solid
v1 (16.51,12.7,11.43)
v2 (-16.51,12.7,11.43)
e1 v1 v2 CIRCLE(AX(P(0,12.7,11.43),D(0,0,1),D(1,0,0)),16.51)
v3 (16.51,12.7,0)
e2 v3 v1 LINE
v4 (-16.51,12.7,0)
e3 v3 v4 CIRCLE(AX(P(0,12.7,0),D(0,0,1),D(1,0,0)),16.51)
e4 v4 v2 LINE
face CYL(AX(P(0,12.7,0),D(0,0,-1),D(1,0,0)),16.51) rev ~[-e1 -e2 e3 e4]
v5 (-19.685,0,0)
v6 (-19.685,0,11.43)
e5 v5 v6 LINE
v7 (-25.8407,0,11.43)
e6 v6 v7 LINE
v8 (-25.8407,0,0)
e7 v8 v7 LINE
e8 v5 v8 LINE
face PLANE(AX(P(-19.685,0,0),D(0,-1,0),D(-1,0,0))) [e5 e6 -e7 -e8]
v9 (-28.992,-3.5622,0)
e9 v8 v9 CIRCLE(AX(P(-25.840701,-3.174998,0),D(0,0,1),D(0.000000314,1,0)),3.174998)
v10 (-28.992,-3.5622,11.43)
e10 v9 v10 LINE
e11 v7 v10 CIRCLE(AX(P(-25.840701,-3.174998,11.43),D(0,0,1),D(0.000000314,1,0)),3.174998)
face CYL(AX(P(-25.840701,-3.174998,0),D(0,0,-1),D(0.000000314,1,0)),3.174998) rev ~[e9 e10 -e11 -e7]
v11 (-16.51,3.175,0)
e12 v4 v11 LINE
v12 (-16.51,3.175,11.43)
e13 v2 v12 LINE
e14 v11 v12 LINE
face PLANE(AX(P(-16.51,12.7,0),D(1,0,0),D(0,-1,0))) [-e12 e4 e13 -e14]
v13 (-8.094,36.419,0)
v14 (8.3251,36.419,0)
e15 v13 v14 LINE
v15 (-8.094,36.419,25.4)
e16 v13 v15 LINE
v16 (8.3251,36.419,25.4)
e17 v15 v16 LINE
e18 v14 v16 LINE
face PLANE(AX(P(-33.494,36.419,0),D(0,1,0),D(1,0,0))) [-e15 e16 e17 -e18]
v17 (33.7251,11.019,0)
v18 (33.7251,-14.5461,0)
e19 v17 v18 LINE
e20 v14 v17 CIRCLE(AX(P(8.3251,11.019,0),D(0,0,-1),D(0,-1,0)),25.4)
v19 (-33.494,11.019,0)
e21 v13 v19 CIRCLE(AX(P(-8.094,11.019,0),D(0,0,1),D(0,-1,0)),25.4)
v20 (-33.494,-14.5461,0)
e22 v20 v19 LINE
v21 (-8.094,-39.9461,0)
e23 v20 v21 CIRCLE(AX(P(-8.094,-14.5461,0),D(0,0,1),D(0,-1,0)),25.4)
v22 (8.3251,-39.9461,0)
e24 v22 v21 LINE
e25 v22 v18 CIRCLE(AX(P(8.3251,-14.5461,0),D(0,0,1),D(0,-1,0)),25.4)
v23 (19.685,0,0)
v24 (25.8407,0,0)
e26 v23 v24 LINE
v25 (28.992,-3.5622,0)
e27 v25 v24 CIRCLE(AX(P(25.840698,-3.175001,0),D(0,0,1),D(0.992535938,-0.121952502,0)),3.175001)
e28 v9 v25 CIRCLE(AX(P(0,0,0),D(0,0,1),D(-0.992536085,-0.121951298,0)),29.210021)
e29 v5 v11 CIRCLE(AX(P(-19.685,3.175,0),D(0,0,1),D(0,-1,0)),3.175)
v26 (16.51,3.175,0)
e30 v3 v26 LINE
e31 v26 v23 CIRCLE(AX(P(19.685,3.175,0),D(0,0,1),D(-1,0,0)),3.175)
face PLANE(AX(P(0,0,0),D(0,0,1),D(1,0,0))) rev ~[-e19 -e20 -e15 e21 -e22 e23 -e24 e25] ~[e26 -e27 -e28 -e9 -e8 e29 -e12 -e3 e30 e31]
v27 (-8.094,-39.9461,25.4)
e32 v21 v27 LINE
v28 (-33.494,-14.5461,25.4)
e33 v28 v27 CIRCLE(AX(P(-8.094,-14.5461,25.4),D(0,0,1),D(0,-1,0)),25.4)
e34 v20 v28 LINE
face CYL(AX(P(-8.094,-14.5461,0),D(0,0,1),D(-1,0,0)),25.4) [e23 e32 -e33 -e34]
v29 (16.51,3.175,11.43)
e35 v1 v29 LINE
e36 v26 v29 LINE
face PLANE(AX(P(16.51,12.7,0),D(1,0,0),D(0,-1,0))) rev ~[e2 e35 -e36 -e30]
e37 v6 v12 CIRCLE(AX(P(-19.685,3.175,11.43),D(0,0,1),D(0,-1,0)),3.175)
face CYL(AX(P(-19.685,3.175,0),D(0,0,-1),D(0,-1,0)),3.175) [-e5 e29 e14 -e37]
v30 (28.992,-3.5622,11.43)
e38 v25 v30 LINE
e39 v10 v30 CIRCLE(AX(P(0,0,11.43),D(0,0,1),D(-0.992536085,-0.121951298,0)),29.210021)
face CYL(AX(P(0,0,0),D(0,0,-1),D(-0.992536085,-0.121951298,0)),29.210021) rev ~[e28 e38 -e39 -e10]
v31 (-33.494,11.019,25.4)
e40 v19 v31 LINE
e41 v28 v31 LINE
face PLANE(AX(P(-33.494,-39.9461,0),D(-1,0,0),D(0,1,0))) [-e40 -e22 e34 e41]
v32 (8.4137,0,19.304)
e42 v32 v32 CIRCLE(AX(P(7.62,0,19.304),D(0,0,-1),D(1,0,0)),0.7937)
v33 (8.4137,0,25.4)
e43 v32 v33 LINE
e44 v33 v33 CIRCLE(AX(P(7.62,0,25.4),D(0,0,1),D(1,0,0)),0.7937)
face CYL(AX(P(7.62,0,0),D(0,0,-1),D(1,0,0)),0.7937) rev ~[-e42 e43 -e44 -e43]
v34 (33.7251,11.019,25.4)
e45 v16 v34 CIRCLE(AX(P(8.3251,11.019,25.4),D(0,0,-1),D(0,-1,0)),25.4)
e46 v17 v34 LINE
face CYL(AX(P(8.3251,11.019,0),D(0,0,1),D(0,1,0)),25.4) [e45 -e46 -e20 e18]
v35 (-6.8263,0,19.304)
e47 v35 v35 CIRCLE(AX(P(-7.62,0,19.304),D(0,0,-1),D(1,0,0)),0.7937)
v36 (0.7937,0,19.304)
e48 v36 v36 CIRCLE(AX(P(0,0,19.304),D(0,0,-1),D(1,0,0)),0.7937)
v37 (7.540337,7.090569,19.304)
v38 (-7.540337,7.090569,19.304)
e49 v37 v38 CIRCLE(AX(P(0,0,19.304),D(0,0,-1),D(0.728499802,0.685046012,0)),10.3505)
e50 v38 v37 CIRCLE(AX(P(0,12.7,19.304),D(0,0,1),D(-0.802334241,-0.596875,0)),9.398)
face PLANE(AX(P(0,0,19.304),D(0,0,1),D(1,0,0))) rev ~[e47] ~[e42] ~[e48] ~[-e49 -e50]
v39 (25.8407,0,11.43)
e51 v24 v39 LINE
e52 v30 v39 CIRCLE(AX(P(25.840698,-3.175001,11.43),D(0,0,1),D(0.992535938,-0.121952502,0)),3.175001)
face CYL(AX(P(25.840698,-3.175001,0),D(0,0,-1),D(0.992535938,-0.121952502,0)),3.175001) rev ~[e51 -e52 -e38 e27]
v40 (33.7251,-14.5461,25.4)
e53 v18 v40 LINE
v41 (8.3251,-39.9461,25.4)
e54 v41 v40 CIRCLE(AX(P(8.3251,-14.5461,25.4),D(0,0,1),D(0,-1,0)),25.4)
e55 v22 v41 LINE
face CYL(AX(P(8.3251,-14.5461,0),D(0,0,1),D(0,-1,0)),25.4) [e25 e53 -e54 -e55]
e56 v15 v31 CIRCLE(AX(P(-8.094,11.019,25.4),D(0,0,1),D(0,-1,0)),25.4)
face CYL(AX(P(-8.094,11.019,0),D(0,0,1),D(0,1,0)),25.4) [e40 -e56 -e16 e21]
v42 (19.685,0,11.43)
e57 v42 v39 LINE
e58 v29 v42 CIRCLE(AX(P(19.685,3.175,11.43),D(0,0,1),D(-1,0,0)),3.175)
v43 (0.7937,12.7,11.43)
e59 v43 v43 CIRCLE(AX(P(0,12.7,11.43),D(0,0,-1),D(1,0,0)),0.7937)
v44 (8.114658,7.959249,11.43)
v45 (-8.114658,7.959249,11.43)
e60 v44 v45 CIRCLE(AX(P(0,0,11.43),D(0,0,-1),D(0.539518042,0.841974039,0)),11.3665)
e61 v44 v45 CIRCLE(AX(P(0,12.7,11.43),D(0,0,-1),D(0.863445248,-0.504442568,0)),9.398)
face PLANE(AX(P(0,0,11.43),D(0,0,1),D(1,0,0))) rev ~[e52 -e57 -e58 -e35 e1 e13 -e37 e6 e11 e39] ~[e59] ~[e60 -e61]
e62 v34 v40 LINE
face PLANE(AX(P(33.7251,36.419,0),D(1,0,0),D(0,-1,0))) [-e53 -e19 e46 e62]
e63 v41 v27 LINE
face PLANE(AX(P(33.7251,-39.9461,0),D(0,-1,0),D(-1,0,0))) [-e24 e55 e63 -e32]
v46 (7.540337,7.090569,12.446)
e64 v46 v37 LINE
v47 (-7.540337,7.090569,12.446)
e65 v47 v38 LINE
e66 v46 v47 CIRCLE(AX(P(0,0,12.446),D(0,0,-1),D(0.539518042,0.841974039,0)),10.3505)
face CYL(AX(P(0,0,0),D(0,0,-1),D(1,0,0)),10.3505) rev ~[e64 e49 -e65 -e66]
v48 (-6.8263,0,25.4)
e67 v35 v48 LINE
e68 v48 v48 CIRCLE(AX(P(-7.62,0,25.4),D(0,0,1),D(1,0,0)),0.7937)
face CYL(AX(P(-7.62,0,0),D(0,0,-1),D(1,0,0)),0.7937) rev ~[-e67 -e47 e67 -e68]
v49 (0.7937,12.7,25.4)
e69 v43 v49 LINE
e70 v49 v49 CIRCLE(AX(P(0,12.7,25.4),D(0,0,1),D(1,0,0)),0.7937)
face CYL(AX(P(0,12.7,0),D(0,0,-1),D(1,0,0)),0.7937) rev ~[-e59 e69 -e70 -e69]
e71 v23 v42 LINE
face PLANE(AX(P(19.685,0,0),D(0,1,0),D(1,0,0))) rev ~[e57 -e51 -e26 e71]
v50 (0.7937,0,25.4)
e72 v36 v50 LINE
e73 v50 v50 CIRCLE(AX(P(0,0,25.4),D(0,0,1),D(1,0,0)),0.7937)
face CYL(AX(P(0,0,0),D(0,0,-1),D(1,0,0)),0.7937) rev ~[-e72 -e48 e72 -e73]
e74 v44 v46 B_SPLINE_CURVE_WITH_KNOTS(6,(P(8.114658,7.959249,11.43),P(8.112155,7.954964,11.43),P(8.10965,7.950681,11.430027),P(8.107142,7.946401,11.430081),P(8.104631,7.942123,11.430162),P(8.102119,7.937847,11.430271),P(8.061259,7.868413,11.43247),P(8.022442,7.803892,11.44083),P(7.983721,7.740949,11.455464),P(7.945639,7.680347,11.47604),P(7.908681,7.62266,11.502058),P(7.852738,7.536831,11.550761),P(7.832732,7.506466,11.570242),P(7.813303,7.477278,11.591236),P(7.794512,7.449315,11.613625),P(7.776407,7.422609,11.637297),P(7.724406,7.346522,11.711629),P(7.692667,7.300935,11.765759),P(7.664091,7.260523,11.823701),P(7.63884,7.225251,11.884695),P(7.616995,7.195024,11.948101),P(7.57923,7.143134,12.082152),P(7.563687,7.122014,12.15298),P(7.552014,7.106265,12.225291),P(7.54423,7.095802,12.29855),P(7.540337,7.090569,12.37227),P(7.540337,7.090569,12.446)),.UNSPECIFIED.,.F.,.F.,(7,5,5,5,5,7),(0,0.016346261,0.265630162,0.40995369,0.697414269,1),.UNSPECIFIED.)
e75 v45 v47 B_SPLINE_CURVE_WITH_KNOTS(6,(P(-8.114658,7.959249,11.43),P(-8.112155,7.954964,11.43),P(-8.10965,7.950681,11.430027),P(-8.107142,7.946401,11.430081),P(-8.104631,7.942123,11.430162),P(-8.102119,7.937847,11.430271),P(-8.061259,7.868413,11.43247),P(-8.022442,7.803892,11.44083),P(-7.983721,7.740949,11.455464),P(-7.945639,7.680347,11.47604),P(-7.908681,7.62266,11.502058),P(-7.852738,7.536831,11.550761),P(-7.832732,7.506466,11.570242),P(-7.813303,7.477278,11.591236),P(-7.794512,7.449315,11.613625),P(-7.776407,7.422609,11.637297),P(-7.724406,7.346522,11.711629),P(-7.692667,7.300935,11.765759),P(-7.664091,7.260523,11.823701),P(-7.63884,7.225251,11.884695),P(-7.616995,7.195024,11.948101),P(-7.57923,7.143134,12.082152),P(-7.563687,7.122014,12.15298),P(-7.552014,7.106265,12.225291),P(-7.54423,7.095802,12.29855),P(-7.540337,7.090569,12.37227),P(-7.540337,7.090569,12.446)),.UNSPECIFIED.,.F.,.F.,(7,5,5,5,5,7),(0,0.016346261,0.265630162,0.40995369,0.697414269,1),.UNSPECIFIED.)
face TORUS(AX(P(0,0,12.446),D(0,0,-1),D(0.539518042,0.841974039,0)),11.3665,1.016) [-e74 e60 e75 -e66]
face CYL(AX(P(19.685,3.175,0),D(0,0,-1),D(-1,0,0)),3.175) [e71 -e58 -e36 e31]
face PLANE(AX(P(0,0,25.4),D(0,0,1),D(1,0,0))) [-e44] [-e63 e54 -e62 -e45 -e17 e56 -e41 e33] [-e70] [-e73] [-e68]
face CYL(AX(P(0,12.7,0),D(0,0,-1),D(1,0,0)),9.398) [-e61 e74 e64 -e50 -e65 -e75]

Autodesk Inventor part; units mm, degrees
ref_plane "YZ Plane" through (0, 0, 0) normal (1, 0, 0) x (0, 1, 0)
ref_plane "XZ Plane" through (0, 0, 0) normal (0, 1, 0) x (-1, 0, 0)
ref_plane "XY Plane" through (0, 0, 0) normal (0, 0, 1) x (1, 0, 0)
sketch "Sketch1" plane through (0, 0, 0) normal (0, 0, 1) x (1, 0, 0)
  circle A0 centre (0, 12.7) radius 4.0132
  circle A1 centre (-7.62, 0) radius 1.7145
  circle A2 centre (7.62, 0) radius 1.7145
  circle A3 centre (0, 0) radius 9.525
  arc A4 (-28.992, -3.5622) -> (28.992, -3.5622) centre (0, 0) ccw
  line L0 (-16.51, 12.7) -> (-16.51, 3.175)
  line L1 (16.51, 12.7) -> (16.51, 3.175)
  line L2 (19.685, 0) -> (25.8407, 0)
  line L3 (-19.685, 0) -> (-25.8407, 0)
  arc A5 (16.51, 12.7) -> (-16.51, 12.7) centre (0, 12.7) ccw
  arc A6 (-25.8407, 0) -> (-28.992, -3.5622) centre (-25.8407, -3.175) ccw
  arc A7 (-19.685, 0) -> (-16.51, 3.175) centre (-19.685, 3.175) ccw
  arc A8 (16.51, 3.175) -> (19.685, 0) centre (19.685, 3.175) ccw
  arc A9 (28.992, -3.5622) -> (25.8407, 0) centre (25.8407, -3.175) ccw
  circle A10 centre (0, 12.7) radius 9.398
  circle A11 centre (0, 0) radius 2.4765
  circle A12 centre (0, 0) radius 6.35
  line L4 (-33.494, 36.419) -> (33.7251, 36.419)
  line L5 (33.7251, 36.419) -> (33.7251, -39.9461)
  line L6 (33.7251, -39.9461) -> (-33.494, -39.9461)
  line L7 (-33.494, -39.9461) -> (-33.494, 36.419)
  circle A13 centre (0, 0) radius 10.3505
  circle A14 centre (-7.62, 0) radius 0.7937
  circle A15 centre (0, 0) radius 0.7937
  circle A16 centre (7.62, 0) radius 0.7937
  circle A17 centre (0, 12.7) radius 0.7937
  line L8 (-16.8374, 12.7) -> (-16.8374, 3.175)
  arc A18 (-19.685, 0.3274) -> (-16.8374, 3.175) centre (-19.685, 3.175) ccw
  line L9 (-19.685, 0.3274) -> (-25.8407, 0.3274)
  arc A19 (-25.8407, 0.3274) -> (-29.3169, -3.6021) centre (-25.8407, -3.175) ccw
  arc A20 (-29.3169, -3.6021) -> (29.3169, -3.6021) centre (0, 0) ccw
  arc A21 (29.3169, -3.6021) -> (25.8407, 0.3274) centre (25.8407, -3.175) ccw
  line L10 (25.8407, 0.3274) -> (19.685, 0.3274)
  arc A22 (16.8374, 3.175) -> (19.685, 0.3274) centre (19.685, 3.175) ccw
  line L11 (16.8374, 3.175) -> (16.8374, 12.7)
  arc A23 (16.8374, 12.7) -> (-16.8374, 12.7) centre (0, 12.7) ccw
  point P0 (-16.51, -24.0966)
  point P1 (16.51, -24.0966)
  point P2 (-29.21, 0)
  point P3 (29.21, 0)
  point P4 (-2.1125, 9.2878)
  point P5 (2.1125, 9.2878)
  point P6 (7.0137, 6.4446)
  point P7 (-7.0137, 6.4446)
  point P8 (-6.263, 1.0478)
  point P9 (-6.263, -1.0478)
  point P10 (6.263, -1.0478)
  point P11 (6.263, 1.0478)
  point P12 (4.5198, 4.4602)
  point P13 (-4.5198, 4.4602)
  point P14 (-7.5403, 7.0906)
  point P15 (7.5403, 7.0906)
  dimension "d20" = 8.0264
  dimension "d44" = 3.175
  dimension "d57" = 18.796
  dimension "d70" = 3.429
  dimension "d73" = 29.21
  dimension "d76" = 7.62
  dimension "d77" = 7.62
  dimension "d84" = 12.7
  dimension "d85" = 4.953
  dimension "d97" = 1.5875
  dimension "d98" = 1.5875
  dimension "d99" = 1.5875
  dimension "d100" = 1.5875
  dimension "d109" = 20.701
extrude "Extrusion22" add sketch "Sketch1" along normal blind 25.4 contours A0 A13 | A0 A13 A10 | A13 A0 A3 | A0 A3 A10 A13 | A13 A10 A3 A0 | A3 A0 | A0 A3 A10 A12 | A10 A3 A13 | A10 A12 A1 A2 A3 | A12 A10 | A10 A12 A2 A1 | A12 A1 | A1 A12 | A12 A2 | A2 A12 | A6 L3 A7 L0 A5 L1 A8 L2 A9 A4 | A11 | L4 L5 L6 L7 | A23 L11 A22 L10 A21 A20 A19 L9 A18 L8
extrude "Extrusion23" cut sketch "Sketch1" along normal blind 19.304 contours A10 A3 A13 | A10 A12 A1 A2 A3 | A10 A12 A2 A1 | A12 A1 | A1 A12 | A12 A2 | A2 A12 | A11 | A14 | A15 | A16
extrude "Extrusion24" cut sketch "Sketch1" along normal blind 11.43 contours A0 A13 | A0 A13 A10 | A13 A0 A3 | A0 A3 A10 A13 | A13 A10 A3 A0 | A3 A0 | A0 A3 A10 A12 | A10 A3 A13 | A10 A12 A1 A2 A3 | A12 A10 | A10 A12 A2 A1 | A12 A1 | A1 A12 | A12 A2 | A2 A12 | A6 L3 A7 L0 A5 L1 A8 L2 A9 A4 | A11 | A14 | A15 | A16 | A17
fillet "Fillet4" radius 1.016 1 edges at (0, -10.3505, 11.43)
fillet "Fillet5" radius 25.4 4 edges at (33.7251, -39.9461, 12.7) (-33.494, -39.9461, 12.7) (-33.494, 36.419, 12.7) (33.7251, 36.419, 12.7)
properties part number "Crank on Crankshaft_3DPrint"
